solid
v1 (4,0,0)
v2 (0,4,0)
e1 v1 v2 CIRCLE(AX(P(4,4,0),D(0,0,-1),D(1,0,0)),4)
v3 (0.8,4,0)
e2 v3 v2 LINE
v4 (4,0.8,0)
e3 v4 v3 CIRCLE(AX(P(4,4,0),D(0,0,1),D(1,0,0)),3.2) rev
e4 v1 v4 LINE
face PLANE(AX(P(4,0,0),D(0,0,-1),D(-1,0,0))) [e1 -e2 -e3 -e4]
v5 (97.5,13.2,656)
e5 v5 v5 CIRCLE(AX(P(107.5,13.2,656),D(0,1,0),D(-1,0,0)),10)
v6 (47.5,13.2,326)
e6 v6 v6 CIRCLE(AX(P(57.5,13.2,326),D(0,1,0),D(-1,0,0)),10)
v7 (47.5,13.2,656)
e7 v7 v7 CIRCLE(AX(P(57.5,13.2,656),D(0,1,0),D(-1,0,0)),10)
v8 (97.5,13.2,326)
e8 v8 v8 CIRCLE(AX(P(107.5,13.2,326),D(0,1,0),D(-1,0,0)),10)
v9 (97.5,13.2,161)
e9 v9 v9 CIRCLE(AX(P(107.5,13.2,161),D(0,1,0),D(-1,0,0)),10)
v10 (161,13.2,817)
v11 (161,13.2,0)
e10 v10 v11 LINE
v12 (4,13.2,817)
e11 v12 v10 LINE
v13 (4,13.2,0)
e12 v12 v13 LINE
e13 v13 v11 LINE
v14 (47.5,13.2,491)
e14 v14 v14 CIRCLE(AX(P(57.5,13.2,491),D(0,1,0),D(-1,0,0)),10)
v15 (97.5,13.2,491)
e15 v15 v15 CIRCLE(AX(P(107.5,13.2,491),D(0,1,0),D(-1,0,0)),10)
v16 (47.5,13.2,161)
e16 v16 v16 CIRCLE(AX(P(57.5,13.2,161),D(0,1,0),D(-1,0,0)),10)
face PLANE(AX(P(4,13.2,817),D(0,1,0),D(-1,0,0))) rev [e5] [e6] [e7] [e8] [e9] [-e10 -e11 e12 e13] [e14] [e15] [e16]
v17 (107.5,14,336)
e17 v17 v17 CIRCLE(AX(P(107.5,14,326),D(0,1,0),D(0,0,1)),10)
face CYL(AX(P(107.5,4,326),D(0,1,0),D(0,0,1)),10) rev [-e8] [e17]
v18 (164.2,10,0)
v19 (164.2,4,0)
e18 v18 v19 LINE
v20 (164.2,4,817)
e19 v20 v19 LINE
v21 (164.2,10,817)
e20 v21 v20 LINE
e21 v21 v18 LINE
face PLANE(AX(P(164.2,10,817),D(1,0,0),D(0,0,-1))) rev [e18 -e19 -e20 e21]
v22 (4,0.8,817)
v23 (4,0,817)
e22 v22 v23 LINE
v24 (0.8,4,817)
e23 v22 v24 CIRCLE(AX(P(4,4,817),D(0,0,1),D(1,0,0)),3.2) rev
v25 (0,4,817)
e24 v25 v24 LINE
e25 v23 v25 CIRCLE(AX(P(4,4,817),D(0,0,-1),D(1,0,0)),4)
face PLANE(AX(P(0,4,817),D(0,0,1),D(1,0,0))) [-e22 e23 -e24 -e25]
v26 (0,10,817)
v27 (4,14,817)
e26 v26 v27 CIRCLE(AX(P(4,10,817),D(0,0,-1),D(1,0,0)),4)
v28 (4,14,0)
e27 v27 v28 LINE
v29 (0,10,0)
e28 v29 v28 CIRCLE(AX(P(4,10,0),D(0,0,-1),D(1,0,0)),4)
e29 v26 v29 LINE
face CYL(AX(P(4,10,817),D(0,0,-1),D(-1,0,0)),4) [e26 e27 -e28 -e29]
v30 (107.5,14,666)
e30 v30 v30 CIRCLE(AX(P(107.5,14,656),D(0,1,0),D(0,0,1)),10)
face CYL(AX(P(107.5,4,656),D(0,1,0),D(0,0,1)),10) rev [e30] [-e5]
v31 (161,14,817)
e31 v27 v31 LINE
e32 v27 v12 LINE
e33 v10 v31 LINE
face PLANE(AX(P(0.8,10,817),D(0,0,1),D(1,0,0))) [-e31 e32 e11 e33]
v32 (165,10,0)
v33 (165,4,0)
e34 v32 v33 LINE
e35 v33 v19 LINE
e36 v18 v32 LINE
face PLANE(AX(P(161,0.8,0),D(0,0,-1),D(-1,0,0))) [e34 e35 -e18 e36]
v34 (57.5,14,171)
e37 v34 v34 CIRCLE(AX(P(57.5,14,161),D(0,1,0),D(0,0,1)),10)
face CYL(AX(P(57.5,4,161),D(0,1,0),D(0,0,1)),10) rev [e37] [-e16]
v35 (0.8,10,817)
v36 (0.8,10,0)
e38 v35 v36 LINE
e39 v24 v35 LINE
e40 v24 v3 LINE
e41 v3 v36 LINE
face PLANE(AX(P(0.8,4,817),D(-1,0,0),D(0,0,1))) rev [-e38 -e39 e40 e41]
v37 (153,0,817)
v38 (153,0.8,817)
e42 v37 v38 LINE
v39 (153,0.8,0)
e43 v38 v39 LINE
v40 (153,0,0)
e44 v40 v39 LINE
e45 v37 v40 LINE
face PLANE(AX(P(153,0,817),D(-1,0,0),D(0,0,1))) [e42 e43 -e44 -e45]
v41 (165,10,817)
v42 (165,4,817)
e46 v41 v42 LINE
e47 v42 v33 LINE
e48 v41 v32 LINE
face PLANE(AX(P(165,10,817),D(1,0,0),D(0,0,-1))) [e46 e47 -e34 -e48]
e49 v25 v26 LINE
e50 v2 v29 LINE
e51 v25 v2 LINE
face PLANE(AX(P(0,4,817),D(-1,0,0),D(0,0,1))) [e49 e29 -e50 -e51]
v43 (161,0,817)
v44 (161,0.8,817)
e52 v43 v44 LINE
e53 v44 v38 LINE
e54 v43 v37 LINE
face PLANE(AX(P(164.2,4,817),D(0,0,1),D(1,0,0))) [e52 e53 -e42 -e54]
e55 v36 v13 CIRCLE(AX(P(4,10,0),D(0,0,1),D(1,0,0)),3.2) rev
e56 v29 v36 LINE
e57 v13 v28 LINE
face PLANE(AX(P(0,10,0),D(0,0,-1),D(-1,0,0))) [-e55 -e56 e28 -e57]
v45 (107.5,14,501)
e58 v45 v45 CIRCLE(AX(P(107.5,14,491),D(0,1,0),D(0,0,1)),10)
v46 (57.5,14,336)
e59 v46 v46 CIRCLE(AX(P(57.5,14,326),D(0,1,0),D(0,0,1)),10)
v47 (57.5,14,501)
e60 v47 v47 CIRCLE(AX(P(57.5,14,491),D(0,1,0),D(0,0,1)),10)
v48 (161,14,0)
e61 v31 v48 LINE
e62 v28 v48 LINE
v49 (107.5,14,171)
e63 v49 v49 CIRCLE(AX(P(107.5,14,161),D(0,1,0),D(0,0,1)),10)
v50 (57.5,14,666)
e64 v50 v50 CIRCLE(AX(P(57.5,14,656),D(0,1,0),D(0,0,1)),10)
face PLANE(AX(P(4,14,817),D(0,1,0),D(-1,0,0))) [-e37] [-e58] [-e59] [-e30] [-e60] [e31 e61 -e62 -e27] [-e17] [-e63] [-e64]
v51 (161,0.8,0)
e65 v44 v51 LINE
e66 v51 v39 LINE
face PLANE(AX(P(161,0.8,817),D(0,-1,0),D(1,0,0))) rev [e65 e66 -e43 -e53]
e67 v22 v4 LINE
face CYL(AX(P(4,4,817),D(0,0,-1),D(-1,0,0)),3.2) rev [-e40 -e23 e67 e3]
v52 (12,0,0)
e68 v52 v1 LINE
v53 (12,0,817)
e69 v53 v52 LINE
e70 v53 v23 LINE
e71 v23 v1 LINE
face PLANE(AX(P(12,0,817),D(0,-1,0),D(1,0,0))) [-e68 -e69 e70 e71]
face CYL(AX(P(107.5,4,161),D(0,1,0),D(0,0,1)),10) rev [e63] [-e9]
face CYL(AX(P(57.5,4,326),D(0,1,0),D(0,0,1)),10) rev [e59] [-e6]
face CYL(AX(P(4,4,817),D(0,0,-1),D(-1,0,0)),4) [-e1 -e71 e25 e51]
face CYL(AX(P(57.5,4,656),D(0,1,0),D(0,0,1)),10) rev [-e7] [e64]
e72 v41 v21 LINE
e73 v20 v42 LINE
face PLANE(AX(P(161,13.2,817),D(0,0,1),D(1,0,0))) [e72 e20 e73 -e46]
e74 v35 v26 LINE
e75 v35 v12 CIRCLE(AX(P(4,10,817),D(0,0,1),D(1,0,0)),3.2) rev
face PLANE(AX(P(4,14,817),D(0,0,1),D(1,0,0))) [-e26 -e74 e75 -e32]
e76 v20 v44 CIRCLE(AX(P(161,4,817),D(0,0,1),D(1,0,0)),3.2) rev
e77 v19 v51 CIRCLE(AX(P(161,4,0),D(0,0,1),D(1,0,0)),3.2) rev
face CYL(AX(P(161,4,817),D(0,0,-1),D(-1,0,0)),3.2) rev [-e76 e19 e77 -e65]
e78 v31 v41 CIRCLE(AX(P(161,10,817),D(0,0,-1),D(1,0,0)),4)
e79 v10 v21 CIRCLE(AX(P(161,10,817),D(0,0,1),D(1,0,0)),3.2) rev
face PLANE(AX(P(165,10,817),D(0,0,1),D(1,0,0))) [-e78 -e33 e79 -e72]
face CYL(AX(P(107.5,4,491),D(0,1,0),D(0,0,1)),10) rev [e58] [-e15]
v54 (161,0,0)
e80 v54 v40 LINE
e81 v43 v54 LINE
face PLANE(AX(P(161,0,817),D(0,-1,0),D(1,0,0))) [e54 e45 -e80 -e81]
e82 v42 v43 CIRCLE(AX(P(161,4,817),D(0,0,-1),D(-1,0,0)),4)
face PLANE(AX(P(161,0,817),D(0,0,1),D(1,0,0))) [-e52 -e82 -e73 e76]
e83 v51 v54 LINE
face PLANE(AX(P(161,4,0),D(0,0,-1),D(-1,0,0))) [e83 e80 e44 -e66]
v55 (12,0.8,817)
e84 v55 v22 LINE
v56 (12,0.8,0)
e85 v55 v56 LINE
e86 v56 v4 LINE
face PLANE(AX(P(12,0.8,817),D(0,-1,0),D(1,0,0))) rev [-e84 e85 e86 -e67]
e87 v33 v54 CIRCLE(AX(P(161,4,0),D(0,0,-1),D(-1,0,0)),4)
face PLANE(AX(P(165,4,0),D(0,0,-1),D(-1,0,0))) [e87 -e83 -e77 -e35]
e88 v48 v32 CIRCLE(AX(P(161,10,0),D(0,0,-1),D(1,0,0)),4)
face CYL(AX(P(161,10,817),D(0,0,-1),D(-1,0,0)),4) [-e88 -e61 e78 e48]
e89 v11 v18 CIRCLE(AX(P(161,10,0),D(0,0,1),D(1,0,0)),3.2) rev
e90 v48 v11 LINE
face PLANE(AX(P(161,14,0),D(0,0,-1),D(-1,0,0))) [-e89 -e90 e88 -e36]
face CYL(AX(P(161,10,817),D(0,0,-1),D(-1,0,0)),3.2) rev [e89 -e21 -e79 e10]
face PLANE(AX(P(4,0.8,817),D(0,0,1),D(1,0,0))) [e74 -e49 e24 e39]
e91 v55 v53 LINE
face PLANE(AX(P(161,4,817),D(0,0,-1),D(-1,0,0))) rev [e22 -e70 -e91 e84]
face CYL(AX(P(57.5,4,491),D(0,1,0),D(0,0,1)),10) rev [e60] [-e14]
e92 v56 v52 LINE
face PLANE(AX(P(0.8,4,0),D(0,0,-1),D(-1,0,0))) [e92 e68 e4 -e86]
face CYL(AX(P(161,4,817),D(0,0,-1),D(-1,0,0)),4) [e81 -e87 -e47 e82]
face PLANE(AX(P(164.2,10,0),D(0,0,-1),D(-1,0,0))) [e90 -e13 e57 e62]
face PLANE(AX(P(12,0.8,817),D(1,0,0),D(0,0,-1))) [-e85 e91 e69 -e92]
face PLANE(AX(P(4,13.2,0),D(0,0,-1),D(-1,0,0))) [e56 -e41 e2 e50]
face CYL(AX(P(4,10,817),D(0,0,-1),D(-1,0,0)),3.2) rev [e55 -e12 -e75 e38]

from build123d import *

# Parameters (mm, degrees)
BASE_FLANGE1_DEPTH = 817
SKETCH6_R          = 10
CUT_EXTRUDE1_DEPTH = 10


# Sheet-metal steps are written as plain solids
with BuildPart() as part:
    # Sketch1 → Base-Flange1 (new body)
    with BuildSketch(Plane.XY):
        with BuildLine():
            Line((12, 0), (4, 0))
            ThreePointArc((4, 0), (1.171572875, 1.171572875), (0, 4))
            Line((0, 4), (0, 10))
            ThreePointArc((0, 10), (1.171572875, 12.828427125), (4, 14))
            Line((4, 14), (161, 14))
            ThreePointArc((161, 14), (163.828427125, 12.828427125), (165, 10))
            Line((165, 10), (165, 4))
            ThreePointArc((165, 4), (163.828427125, 1.171572875), (161, 0))
            Line((161, 0), (153, 0))
            Line((153, 0), (153, 0.8))
            Line((153, 0.8), (161, 0.8))
            ThreePointArc((161, 0.8), (163.2627417, 1.7372583), (164.2, 4))
            Line((164.2, 4), (164.2, 10))
            ThreePointArc((164.2, 10), (163.2627417, 12.2627417), (161, 13.2))
            Line((161, 13.2), (4, 13.2))
            ThreePointArc((4, 13.2), (1.7372583, 12.2627417), (0.8, 10))
            Line((0.8, 10), (0.8, 4))
            ThreePointArc((0.8, 4), (1.7372583, 1.7372583), (4, 0.8))
            Line((4, 0.8), (12, 0.8))
            Line((12, 0.8), (12, 0))
        make_face()
    extrude(amount=BASE_FLANGE1_DEPTH)

    # Sketch6 → Cut-Extrude1 (cut)
    with BuildSketch(Plane(origin=(0, 14, 0), x_dir=(1, 0, 0), z_dir=(0, 1, 0))):
        with Locations(Location((107.5, -326, 0), (0, 0, 270))):
            Circle(SKETCH6_R)
        with Locations(Location((107.5, -161, 0), (0, 0, 270))):
            Circle(SKETCH6_R)
        with Locations(Location((107.5, -491, 0), (0, 0, 270))):
            Circle(SKETCH6_R)
        with Locations(Location((107.5, -656, 0), (0, 0, 270))):
            Circle(SKETCH6_R)
        with Locations(Location((57.5, -656, 0), (0, 0, 270))):
            Circle(SKETCH6_R)
        with Locations(Location((57.5, -491, 0), (0, 0, 270))):
            Circle(SKETCH6_R)
        with Locations(Location((57.5, -326, 0), (0, 0, 270))):
            Circle(SKETCH6_R)
        with Locations(Location((57.5, -161, 0), (0, 0, 270))):
            Circle(SKETCH6_R)
    extrude(amount=-CUT_EXTRUDE1_DEPTH, mode=Mode.SUBTRACT)


solid = part.part
